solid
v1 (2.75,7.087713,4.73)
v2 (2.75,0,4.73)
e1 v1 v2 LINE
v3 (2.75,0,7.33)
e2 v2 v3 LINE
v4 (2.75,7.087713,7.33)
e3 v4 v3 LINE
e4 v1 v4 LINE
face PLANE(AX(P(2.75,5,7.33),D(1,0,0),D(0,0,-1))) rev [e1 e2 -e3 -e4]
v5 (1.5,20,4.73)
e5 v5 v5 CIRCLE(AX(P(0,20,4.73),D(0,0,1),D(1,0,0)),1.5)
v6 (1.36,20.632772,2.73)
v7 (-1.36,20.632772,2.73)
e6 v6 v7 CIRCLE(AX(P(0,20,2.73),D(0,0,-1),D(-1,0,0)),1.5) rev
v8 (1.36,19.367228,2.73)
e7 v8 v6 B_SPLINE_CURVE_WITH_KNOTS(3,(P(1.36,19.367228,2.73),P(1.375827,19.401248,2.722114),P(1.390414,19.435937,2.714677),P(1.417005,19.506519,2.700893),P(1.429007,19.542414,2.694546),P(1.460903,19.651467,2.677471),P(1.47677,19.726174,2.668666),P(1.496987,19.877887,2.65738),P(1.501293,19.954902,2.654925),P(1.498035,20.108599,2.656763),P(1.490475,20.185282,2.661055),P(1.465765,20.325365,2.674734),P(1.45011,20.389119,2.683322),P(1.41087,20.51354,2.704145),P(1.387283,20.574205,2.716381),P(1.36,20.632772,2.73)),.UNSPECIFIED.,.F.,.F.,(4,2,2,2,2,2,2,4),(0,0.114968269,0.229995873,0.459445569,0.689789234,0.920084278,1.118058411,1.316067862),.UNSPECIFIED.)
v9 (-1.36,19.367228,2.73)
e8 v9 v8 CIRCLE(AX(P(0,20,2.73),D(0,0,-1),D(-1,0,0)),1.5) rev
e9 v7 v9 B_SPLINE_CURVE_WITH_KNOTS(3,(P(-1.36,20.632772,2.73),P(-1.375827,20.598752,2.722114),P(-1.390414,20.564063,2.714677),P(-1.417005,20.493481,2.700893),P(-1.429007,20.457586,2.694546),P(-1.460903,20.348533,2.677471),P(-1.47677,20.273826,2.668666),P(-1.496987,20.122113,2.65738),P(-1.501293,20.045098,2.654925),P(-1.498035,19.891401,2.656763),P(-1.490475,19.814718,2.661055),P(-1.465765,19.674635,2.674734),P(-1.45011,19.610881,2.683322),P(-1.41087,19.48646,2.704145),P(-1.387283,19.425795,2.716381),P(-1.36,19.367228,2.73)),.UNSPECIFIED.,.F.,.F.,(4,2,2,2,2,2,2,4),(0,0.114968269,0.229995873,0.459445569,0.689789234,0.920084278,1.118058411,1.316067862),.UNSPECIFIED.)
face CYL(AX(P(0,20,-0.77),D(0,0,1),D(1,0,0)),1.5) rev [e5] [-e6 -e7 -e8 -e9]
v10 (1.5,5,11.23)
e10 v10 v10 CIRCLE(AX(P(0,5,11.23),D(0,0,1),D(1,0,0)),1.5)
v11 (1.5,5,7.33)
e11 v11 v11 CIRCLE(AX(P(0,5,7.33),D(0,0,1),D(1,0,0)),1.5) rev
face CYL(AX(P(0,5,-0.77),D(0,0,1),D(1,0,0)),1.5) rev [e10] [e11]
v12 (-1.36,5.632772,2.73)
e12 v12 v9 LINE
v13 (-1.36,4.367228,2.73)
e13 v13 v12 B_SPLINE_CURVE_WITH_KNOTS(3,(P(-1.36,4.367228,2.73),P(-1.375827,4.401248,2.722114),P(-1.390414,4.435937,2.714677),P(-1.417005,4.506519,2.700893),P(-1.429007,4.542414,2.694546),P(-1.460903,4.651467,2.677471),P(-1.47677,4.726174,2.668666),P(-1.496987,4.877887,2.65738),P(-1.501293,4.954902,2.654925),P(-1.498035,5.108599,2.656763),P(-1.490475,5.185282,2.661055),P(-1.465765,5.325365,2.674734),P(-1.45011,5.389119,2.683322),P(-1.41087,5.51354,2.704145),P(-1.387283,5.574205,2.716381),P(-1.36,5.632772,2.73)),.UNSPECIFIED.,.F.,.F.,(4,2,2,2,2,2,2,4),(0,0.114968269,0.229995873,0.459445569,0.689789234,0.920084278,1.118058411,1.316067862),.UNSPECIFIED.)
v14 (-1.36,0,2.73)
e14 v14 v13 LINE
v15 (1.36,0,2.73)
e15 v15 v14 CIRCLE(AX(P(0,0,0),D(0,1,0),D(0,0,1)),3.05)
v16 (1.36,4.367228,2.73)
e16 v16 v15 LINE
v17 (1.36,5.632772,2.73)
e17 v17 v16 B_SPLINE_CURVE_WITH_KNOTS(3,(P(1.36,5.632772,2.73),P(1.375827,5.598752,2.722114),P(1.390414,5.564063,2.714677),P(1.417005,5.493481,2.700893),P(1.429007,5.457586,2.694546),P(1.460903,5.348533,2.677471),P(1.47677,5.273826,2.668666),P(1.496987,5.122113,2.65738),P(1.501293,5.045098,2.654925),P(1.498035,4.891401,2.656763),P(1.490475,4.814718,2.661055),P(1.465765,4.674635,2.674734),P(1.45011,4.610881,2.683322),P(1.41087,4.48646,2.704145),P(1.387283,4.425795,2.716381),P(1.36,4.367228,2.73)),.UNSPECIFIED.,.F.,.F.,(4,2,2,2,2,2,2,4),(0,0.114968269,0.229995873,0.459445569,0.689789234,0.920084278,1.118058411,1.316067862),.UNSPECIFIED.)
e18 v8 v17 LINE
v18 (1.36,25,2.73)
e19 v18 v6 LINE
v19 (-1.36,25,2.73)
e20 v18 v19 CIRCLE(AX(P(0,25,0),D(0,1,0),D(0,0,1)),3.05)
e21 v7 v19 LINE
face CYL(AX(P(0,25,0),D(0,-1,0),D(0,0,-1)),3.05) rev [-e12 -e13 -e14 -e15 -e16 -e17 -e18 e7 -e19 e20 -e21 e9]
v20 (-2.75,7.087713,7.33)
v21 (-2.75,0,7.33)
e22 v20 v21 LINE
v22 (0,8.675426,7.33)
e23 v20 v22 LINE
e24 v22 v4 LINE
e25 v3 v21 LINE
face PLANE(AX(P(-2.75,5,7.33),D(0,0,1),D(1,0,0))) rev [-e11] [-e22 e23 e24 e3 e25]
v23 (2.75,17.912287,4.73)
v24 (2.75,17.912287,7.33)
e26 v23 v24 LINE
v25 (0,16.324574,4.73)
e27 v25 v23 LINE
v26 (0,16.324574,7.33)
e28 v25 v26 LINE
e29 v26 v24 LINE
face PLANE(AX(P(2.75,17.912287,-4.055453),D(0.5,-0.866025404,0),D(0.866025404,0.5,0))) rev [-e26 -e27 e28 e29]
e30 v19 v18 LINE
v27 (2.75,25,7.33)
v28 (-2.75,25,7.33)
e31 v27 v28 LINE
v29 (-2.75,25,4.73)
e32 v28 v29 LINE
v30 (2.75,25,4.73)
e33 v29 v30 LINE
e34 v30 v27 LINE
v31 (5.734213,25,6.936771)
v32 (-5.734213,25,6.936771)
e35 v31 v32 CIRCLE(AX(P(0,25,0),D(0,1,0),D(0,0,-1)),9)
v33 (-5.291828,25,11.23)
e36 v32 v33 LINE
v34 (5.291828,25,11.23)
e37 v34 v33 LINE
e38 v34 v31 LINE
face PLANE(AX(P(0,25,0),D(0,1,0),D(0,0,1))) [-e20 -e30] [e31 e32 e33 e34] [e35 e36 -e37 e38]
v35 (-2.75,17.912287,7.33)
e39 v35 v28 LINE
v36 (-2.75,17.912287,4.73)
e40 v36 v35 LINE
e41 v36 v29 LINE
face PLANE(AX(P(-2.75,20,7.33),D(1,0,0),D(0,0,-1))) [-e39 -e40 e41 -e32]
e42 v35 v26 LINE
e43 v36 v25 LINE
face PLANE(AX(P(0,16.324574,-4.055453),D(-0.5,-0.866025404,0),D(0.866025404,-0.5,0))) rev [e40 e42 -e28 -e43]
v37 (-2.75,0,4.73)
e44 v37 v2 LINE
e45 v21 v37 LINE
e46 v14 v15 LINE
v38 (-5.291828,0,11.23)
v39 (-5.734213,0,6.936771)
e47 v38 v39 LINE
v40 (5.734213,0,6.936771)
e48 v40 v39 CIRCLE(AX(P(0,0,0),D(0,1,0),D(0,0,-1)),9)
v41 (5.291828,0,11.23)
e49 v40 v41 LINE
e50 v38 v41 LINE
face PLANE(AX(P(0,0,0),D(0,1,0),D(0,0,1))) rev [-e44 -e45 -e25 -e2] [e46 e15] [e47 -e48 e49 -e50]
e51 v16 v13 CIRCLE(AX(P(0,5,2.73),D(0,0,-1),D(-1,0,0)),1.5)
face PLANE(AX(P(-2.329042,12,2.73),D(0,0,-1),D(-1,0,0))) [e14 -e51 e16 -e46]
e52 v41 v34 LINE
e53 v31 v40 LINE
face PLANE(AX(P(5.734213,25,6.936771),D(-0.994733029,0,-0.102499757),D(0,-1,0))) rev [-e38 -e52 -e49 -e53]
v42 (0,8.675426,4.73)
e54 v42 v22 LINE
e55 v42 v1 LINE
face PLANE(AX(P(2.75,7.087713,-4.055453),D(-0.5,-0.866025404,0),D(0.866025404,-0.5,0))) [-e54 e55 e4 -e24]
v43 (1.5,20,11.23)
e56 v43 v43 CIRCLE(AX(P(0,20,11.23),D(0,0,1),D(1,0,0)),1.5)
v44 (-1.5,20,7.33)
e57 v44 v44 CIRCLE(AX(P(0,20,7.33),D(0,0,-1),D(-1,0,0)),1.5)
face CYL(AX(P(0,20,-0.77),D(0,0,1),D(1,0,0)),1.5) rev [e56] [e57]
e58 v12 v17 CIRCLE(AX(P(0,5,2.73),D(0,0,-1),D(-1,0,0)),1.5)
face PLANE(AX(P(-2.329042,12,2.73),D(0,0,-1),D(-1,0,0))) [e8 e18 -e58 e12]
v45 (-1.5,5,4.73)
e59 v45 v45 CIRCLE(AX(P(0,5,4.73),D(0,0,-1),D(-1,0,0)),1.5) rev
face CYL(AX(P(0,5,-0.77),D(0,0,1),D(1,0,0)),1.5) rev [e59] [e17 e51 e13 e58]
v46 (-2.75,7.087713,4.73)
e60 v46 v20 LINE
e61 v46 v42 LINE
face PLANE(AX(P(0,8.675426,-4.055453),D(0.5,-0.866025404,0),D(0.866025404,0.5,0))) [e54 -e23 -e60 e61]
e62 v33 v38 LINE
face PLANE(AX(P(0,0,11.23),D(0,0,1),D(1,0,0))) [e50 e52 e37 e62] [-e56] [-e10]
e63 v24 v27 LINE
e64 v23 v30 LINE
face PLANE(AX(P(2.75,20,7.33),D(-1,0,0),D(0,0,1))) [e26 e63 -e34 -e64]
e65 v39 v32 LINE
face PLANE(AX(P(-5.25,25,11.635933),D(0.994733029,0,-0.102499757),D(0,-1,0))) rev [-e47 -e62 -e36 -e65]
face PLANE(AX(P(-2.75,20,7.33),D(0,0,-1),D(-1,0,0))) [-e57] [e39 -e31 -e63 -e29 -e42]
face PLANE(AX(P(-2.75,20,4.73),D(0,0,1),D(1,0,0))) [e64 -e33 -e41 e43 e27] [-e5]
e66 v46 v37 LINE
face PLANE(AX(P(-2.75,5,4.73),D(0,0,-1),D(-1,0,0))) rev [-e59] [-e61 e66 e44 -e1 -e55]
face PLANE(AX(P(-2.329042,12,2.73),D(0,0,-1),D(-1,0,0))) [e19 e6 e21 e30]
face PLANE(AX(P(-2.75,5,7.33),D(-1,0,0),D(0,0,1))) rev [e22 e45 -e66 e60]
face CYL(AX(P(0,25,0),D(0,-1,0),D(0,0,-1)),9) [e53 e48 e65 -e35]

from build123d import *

# Parameters (mm, degrees)
SKETCH_1_R          = 6
SKETCH_1_R_2        = 3.05
EXTRUDE_1_DEPTH     = 25
SKETCH_2_W          = 4.705017592
SKETCH_2_H          = 2
EXTRUDE_2_DEPTH     = 12
SKETCH_4_W          = 10.5
SKETCH_4_H          = 6.5
EXTRUDE_3_DEPTH     = 25
SKETCH_6_R          = 1.5
CUT_EXTRUDE_3_DEPTH = 10
SKETCH_5_W          = 5.5
SKETCH_5_H          = 2.6
CUT_EXTRUDE_4_DEPTH = 5
CUT_EXTRUDE_8_DEPTH = 2.6
EXTRUDE_4_DEPTH     = 25
EXTRUDE_START       = 2
SKETCH_14_W         = 10.5
SKETCH_14_H         = 25
SKETCH_14_R         = 1.5
EXTRUDE_5_DEPTH     = 2
CUT_EXTRUDE_9_DEPTH = 30.391636651


with BuildPart() as part:
    # Эскиз1 → Бобышка-Вытянуть1 (new body)
    with BuildSketch(Plane(origin=(0, 0, 0), x_dir=(1, 0, 0), z_dir=(0, 1, 0))):
        with Locations(Location((0, 0, 0), (0, 0, 270))):
            Circle(SKETCH_1_R)
        with Locations(Location((0, 0, 0), (0, 0, 270))):
            Circle(SKETCH_1_R_2, mode=Mode.SUBTRACT)
    extrude(amount=EXTRUDE_1_DEPTH)

    # Эскиз2 → Бобышка-Вытянуть2 (add)
    with BuildSketch(Plane.XZ):
        with Locations((0.023466422, 3.73)):
            Rectangle(SKETCH_2_W, SKETCH_2_H)
    extrude(amount=-EXTRUDE_2_DEPTH)

    # Эскиз4 → Бобышка-Вытянуть3 (add, through all)
    with BuildSketch(Plane.XZ):
        with Locations((0, 5.98)):
            Rectangle(SKETCH_4_W, SKETCH_4_H)
    extrude(amount=-EXTRUDE_3_DEPTH)

    # Эскиз6 → Вырез-Вытянуть3 (cut)
    with BuildSketch(Plane.XY.offset(9.23)):
        with Locations((0, 5)):
            Circle(SKETCH_6_R)
    cut_extrude_3 = extrude(amount=-CUT_EXTRUDE_3_DEPTH, mode=Mode.SUBTRACT)

    # Эскиз5 → Вырез-Вытянуть4 (cut)
    with BuildSketch(Plane.XZ):
        with Locations((0, 6.03)):
            Rectangle(SKETCH_5_W, SKETCH_5_H)
    cut_extrude_4 = extrude(amount=-CUT_EXTRUDE_4_DEPTH, mode=Mode.SUBTRACT)

    # Эскиз11 → Вырез-Вытянуть8 (cut)
    with BuildSketch(Plane(origin=(0, 0, 7.33), x_dir=(-1, 0, 0), z_dir=(0, 0, -1))):
        Polygon((-2.75, 6.58771324), (-2.75, 7.08771324), (0, 8.675426481), (2.75, 7.08771324), (2.75, 6.58771324), (2.75, 3.41228676), (0, 1.824573519), (-2.75, 3.41228676), align=None)
    cut_extrude_8 = extrude(amount=CUT_EXTRUDE_8_DEPTH, mode=Mode.SUBTRACT)

    # Зеркальное отражение1: Вырез-Вытянуть3, Вырез-Вытянуть4, Вырез-Вытянуть8 across plane
    add(cut_extrude_3.mirror(Plane(origin=(0, 12.5, 0), x_dir=(0, 0, 1), z_dir=(0, -1, 0))), mode=Mode.SUBTRACT)
    add(cut_extrude_4.mirror(Plane(origin=(0, 12.5, 0), x_dir=(0, 0, 1), z_dir=(0, -1, 0))), mode=Mode.SUBTRACT)
    add(cut_extrude_8.mirror(Plane(origin=(0, 12.5, 0), x_dir=(0, 0, 1), z_dir=(0, -1, 0))), mode=Mode.SUBTRACT)

    # Эскиз13 → Бобышка-Вытянуть4 (add, through all)
    with BuildSketch(Plane(origin=(0, 25, 0), x_dir=(1, 0, 0), z_dir=(0, 1, 0))):
        with BuildLine():
            Line((-5.25, -2.90473751), (-5.25, -9.23))
            ThreePointArc((-5.25, -9.23), (0, 10.618634564), (5.25, -9.23))
            Line((5.25, -9.23), (5.25, -2.90473751))
            ThreePointArc((5.25, -2.90473751), (0, 6), (-5.25, -2.90473751))
        make_face()
    extrude(amount=-EXTRUDE_4_DEPTH)

    # Эскиз14 → Бобышка-Вытянуть5 (add)
    with BuildSketch(Plane.XY.offset(9.23).offset(EXTRUDE_START)):
        with Locations((0, 12.5)):
            Rectangle(SKETCH_14_W, SKETCH_14_H)
        with Locations((0, 20)):
            Circle(SKETCH_14_R, mode=Mode.SUBTRACT)
        with Locations((0, 5)):
            Circle(SKETCH_14_R, mode=Mode.SUBTRACT)
    extrude(amount=-EXTRUDE_5_DEPTH)

    # Эскиз15 → Вырез-Вытянуть9 (cut, through all)
    with BuildSketch(Plane.XZ):
        with BuildLine():
            Line((-5.25, 9.23), (-5.25, 7.310095759))
            ThreePointArc((-5.25, 7.310095759), (0, -9), (5.25, 7.310095759))
            Line((5.25, 7.310095759), (5.25, 9.23))
            ThreePointArc((5.25, 9.23), (0, -10.618634564), (-5.25, 9.23))
        make_face()
    extrude(amount=-CUT_EXTRUDE_9_DEPTH, mode=Mode.SUBTRACT)

    # Фаска1
    # the kernel refuses this chamfer: 4.36872896, 1 mm, written as the material it adds along each edge
    with BuildSketch(Plane(origin=(-5.25, 0, 7.310095759), x_dir=(0.003980651580542702, 0, 0.9999920771751115), z_dir=(0, 1, 0))) as chamfer_1_piece_1_section:
        with BuildLine():
            Line((4.499702082, 0), (-0.54914754, -0.499943041))
            Line((-0.54914754, -0.499943041), (-0.616269571, -0.444006022))
            ThreePointArc((-0.616269571, -0.444006022), (-0.289511406, -0.238197361), (-0.070765054, 0.051250602))
            Line((-0.070765054, 0.051250602), (0.000347808, 0.087373887))
            ThreePointArc((0.000347808, 0.087373887), (2.250163198, 0.078418085), (4.50004989, 0.087373887))
            Line((4.50004989, 0.087373887), (4.499702082, 0))
        make_face()
    chamfer_1_piece_1 = extrude(amount=25, mode=Mode.PRIVATE)
    chamfer_1_piece_1 = split(chamfer_1_piece_1, bisect_by=Plane(origin=(-5.368726711, 12.5, 11.23), z_dir=(0, 0, -1)), keep=Keep.TOP, mode=Mode.PRIVATE)
    add(chamfer_1_piece_1)

    # Фаска2
    # the kernel refuses this chamfer: 4.36872896, 1 mm, written as the material it adds along each edge
    with BuildSketch(Plane(origin=(5.25, 0, 7.310095759), x_dir=(-0.0039806515805427085, 0, 0.9999920771751115), z_dir=(0, 1, 0))) as chamfer_2_piece_1_section:
        with BuildLine():
            Line((4.499702082, 0), (-0.54914754, 0.499943041))
            Line((-0.54914754, 0.499943041), (-0.616269571, 0.444006022))
            ThreePointArc((-0.616269571, 0.444006022), (-0.289511406, 0.238197361), (-0.070765054, -0.051250602))
            Line((-0.070765054, -0.051250602), (0.000347808, -0.087373887))
            ThreePointArc((0.000347808, -0.087373887), (2.250163198, -0.078418085), (4.50004989, -0.087373887))
            Line((4.50004989, -0.087373887), (4.499702082, 0))
        make_face()
    chamfer_2_piece_1 = extrude(amount=25, mode=Mode.PRIVATE)
    chamfer_2_piece_1 = split(chamfer_2_piece_1, bisect_by=Plane(origin=(5.368726711, 12.5, 11.23), z_dir=(0, 0, -1)), keep=Keep.TOP, mode=Mode.PRIVATE)
    add(chamfer_2_piece_1)


solid = part.part
